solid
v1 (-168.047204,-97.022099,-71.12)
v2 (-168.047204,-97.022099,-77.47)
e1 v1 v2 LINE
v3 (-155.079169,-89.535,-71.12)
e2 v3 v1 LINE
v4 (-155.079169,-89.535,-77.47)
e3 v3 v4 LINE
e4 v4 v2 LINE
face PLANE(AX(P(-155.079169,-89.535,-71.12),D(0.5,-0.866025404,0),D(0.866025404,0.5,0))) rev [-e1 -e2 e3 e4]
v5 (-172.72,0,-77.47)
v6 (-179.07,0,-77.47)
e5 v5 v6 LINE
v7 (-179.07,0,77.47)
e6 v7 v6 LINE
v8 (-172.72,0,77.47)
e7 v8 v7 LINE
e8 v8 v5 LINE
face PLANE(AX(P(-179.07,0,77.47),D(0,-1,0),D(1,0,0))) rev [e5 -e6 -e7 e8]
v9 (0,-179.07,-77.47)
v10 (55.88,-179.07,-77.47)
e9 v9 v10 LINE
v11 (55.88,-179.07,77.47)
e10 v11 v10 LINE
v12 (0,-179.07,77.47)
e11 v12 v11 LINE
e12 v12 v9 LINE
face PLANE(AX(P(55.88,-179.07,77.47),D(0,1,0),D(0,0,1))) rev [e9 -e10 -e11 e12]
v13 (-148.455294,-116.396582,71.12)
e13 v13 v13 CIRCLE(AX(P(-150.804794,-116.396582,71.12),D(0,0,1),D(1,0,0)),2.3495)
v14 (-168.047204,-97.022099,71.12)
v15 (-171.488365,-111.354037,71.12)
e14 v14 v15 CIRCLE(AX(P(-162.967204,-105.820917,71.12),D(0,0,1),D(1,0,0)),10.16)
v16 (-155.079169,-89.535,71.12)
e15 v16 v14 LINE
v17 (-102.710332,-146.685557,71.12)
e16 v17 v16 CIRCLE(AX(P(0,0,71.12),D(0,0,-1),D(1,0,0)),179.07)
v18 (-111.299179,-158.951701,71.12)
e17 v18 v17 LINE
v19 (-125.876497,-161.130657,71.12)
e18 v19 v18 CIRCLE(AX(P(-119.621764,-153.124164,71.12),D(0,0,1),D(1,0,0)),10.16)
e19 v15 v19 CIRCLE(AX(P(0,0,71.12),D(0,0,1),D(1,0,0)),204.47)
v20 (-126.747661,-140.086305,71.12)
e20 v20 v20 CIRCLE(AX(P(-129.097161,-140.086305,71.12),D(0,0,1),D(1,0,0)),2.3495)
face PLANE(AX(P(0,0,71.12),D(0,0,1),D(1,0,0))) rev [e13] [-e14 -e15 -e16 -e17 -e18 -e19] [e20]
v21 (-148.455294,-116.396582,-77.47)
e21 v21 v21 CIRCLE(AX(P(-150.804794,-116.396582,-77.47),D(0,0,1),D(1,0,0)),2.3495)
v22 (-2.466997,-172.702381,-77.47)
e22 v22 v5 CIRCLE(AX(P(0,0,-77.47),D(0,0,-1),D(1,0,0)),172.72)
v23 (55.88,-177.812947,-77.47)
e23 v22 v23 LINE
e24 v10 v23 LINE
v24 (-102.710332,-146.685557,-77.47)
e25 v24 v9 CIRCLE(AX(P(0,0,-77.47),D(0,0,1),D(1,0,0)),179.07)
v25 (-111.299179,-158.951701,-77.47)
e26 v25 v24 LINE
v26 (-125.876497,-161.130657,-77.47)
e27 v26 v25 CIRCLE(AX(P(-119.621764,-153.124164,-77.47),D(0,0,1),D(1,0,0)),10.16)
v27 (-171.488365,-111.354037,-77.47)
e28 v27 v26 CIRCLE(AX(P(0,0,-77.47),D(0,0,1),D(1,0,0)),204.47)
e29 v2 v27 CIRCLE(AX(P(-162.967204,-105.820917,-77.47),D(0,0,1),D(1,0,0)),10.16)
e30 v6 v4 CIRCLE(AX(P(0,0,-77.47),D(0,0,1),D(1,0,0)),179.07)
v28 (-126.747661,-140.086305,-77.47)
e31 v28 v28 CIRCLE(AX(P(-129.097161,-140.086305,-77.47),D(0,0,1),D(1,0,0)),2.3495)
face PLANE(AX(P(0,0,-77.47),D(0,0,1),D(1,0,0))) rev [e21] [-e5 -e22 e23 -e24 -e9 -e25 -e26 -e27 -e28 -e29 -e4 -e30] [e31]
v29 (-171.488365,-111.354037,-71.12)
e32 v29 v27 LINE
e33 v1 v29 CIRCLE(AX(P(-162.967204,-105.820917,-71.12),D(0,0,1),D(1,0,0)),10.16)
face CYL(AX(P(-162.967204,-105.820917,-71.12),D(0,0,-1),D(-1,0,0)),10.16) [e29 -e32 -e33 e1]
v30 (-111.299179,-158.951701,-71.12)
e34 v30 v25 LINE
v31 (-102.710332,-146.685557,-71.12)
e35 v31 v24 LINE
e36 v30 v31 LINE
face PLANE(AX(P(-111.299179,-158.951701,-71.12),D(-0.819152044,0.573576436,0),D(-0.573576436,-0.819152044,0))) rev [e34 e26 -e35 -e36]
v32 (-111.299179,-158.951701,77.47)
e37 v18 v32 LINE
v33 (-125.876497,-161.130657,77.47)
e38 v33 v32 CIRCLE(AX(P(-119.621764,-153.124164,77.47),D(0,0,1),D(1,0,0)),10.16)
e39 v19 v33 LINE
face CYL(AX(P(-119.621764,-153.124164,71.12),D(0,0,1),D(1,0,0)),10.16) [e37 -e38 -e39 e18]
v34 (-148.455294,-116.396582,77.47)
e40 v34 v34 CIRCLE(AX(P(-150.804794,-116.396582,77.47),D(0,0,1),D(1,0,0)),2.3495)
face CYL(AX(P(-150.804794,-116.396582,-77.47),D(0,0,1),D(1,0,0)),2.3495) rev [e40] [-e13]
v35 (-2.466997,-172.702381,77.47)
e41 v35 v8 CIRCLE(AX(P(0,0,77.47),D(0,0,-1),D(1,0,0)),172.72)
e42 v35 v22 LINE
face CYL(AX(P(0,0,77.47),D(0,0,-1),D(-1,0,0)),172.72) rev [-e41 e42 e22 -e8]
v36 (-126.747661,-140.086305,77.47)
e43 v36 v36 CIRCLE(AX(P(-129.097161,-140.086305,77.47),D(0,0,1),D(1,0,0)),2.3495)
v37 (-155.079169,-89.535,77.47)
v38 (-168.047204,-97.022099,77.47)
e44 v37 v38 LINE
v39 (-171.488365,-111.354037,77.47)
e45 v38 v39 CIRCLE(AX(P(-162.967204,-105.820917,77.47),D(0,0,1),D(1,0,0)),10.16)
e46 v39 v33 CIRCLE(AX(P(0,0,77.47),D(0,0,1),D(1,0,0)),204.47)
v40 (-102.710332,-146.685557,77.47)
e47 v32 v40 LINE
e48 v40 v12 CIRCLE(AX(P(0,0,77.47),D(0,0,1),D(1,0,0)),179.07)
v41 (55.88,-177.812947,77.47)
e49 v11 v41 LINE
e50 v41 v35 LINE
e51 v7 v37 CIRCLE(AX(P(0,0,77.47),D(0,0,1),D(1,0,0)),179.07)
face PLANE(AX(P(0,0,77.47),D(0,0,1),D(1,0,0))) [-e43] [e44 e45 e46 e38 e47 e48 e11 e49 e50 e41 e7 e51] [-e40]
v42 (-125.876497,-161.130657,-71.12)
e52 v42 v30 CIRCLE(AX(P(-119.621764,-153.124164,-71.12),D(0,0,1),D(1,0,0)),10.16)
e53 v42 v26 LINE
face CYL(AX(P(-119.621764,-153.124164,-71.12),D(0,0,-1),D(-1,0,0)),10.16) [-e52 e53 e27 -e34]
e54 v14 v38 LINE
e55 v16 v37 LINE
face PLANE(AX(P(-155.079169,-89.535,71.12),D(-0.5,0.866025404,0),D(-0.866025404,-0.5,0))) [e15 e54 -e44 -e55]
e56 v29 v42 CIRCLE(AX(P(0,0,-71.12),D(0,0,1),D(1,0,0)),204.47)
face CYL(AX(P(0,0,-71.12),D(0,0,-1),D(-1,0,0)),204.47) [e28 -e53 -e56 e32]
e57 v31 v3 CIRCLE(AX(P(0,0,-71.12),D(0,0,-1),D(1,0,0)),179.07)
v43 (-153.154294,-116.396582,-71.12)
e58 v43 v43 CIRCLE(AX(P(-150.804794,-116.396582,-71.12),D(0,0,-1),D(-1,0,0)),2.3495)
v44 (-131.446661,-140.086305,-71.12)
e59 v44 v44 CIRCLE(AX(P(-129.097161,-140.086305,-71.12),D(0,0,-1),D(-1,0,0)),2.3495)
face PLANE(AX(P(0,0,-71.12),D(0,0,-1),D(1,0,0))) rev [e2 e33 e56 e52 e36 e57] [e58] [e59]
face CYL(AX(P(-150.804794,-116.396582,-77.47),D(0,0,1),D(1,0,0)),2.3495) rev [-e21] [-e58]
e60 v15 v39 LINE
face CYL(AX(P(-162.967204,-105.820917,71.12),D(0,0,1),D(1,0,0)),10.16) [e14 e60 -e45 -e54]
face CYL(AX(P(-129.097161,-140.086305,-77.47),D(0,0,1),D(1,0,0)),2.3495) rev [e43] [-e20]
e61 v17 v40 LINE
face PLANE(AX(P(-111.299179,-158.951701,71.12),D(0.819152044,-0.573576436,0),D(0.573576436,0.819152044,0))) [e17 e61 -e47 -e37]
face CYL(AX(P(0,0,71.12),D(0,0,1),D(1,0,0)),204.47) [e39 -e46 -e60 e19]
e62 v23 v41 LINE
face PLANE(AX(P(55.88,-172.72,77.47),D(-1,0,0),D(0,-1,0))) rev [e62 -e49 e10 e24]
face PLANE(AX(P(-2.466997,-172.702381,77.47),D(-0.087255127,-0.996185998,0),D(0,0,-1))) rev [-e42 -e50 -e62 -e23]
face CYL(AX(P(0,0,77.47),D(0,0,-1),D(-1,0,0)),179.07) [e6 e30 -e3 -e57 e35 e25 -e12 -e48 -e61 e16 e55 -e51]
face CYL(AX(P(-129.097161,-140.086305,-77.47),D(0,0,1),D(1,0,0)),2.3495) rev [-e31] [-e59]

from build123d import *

# Parameters (mm, degrees)
BOSS_EXTRUDE1_DEPTH = 77.47
BOSS_EXTRUDE2_DEPTH = 6.35
SKETCH3_R           = 2.3495
CUT_EXTRUDE2_DEPTH  = 297.881345658
CHAMFER1_START      = -172.258951726
CHAMFER1_OUTLINE_W  = 62
CHAMFER1_OUTLINE_H  = 158
CHAMFER1_DEPTH      = 6.258951726


with BuildPart() as part:
    # Sketch1 → Boss-Extrude1 (new, symmetric)
    with BuildSketch(Plane.XY):
        with BuildLine():
            Line((-179.07, 0), (-172.72, 0))
            ThreePointArc((-172.72, 0), (-122.131483247, -122.131483247), (0, -172.72))
            Line((0, -172.72), (55.88, -172.72))
            Line((55.88, -172.72), (55.88, -179.07))
            Line((55.88, -179.07), (0, -179.07))
            ThreePointArc((0, -179.07), (-126.621611307, -126.621611307), (-179.07, 0))
        make_face()
    extrude(amount=BOSS_EXTRUDE1_DEPTH, both=True)

    # Sketch2 → Boss-Extrude2 (add)
    with BuildSketch(Plane.XY.offset(77.47)):
        with BuildLine():
            Line((-155.079169056, -89.535), (-168.047204306, -97.022098643))
            ThreePointArc((-168.047204306, -97.022098643), (-172.846425248, -103.448872568), (-171.488365315, -111.354036575))
            ThreePointArc((-171.488365315, -111.354036575), (-150.751097058, -138.137929751), (-125.876496699, -161.130656546))
            ThreePointArc((-125.876496699, -161.130656546), (-118.11977695, -163.172529091), (-111.299179173, -158.951700888))
            Line((-111.299179173, -158.951700888), (-102.710332457, -146.685556571))
            ThreePointArc((-102.710332457, -146.685556571), (-132.024252703, -120.977938478), (-155.079169056, -89.535))
        make_face()
    boss_extrude2 = extrude(amount=-BOSS_EXTRUDE2_DEPTH)

    # Mirror1: Boss-Extrude2 across plane
    add(boss_extrude2.mirror(Plane.XY))

    # Sketch3 → Cut-Extrude2 (cut, through all)
    with BuildSketch(Plane.XY.offset(77.47)):
        with Locations((-150.804793508, -116.396581802)):
            Circle(SKETCH3_R)
        with Locations((-129.097161455, -140.086305199)):
            Circle(SKETCH3_R)
    extrude(amount=-CUT_EXTRUDE2_DEPTH, mode=Mode.SUBTRACT)

    # Chamfer1: read off the stored shape, not the designer's step
    # Chamfer1 outline → Chamfer1 (cut)
    with BuildSketch(Plane(origin=(0, 0, 0), x_dir=(0.996185998135626, -0.0872551266031199, 0), z_dir=(0.0872551266031199, 0.996185998135626, 0)).offset(CHAMFER1_START)):
        with Locations((42, 0)):
            Rectangle(CHAMFER1_OUTLINE_W, CHAMFER1_OUTLINE_H)
    extrude(amount=CHAMFER1_DEPTH, mode=Mode.SUBTRACT)


solid = part.part
